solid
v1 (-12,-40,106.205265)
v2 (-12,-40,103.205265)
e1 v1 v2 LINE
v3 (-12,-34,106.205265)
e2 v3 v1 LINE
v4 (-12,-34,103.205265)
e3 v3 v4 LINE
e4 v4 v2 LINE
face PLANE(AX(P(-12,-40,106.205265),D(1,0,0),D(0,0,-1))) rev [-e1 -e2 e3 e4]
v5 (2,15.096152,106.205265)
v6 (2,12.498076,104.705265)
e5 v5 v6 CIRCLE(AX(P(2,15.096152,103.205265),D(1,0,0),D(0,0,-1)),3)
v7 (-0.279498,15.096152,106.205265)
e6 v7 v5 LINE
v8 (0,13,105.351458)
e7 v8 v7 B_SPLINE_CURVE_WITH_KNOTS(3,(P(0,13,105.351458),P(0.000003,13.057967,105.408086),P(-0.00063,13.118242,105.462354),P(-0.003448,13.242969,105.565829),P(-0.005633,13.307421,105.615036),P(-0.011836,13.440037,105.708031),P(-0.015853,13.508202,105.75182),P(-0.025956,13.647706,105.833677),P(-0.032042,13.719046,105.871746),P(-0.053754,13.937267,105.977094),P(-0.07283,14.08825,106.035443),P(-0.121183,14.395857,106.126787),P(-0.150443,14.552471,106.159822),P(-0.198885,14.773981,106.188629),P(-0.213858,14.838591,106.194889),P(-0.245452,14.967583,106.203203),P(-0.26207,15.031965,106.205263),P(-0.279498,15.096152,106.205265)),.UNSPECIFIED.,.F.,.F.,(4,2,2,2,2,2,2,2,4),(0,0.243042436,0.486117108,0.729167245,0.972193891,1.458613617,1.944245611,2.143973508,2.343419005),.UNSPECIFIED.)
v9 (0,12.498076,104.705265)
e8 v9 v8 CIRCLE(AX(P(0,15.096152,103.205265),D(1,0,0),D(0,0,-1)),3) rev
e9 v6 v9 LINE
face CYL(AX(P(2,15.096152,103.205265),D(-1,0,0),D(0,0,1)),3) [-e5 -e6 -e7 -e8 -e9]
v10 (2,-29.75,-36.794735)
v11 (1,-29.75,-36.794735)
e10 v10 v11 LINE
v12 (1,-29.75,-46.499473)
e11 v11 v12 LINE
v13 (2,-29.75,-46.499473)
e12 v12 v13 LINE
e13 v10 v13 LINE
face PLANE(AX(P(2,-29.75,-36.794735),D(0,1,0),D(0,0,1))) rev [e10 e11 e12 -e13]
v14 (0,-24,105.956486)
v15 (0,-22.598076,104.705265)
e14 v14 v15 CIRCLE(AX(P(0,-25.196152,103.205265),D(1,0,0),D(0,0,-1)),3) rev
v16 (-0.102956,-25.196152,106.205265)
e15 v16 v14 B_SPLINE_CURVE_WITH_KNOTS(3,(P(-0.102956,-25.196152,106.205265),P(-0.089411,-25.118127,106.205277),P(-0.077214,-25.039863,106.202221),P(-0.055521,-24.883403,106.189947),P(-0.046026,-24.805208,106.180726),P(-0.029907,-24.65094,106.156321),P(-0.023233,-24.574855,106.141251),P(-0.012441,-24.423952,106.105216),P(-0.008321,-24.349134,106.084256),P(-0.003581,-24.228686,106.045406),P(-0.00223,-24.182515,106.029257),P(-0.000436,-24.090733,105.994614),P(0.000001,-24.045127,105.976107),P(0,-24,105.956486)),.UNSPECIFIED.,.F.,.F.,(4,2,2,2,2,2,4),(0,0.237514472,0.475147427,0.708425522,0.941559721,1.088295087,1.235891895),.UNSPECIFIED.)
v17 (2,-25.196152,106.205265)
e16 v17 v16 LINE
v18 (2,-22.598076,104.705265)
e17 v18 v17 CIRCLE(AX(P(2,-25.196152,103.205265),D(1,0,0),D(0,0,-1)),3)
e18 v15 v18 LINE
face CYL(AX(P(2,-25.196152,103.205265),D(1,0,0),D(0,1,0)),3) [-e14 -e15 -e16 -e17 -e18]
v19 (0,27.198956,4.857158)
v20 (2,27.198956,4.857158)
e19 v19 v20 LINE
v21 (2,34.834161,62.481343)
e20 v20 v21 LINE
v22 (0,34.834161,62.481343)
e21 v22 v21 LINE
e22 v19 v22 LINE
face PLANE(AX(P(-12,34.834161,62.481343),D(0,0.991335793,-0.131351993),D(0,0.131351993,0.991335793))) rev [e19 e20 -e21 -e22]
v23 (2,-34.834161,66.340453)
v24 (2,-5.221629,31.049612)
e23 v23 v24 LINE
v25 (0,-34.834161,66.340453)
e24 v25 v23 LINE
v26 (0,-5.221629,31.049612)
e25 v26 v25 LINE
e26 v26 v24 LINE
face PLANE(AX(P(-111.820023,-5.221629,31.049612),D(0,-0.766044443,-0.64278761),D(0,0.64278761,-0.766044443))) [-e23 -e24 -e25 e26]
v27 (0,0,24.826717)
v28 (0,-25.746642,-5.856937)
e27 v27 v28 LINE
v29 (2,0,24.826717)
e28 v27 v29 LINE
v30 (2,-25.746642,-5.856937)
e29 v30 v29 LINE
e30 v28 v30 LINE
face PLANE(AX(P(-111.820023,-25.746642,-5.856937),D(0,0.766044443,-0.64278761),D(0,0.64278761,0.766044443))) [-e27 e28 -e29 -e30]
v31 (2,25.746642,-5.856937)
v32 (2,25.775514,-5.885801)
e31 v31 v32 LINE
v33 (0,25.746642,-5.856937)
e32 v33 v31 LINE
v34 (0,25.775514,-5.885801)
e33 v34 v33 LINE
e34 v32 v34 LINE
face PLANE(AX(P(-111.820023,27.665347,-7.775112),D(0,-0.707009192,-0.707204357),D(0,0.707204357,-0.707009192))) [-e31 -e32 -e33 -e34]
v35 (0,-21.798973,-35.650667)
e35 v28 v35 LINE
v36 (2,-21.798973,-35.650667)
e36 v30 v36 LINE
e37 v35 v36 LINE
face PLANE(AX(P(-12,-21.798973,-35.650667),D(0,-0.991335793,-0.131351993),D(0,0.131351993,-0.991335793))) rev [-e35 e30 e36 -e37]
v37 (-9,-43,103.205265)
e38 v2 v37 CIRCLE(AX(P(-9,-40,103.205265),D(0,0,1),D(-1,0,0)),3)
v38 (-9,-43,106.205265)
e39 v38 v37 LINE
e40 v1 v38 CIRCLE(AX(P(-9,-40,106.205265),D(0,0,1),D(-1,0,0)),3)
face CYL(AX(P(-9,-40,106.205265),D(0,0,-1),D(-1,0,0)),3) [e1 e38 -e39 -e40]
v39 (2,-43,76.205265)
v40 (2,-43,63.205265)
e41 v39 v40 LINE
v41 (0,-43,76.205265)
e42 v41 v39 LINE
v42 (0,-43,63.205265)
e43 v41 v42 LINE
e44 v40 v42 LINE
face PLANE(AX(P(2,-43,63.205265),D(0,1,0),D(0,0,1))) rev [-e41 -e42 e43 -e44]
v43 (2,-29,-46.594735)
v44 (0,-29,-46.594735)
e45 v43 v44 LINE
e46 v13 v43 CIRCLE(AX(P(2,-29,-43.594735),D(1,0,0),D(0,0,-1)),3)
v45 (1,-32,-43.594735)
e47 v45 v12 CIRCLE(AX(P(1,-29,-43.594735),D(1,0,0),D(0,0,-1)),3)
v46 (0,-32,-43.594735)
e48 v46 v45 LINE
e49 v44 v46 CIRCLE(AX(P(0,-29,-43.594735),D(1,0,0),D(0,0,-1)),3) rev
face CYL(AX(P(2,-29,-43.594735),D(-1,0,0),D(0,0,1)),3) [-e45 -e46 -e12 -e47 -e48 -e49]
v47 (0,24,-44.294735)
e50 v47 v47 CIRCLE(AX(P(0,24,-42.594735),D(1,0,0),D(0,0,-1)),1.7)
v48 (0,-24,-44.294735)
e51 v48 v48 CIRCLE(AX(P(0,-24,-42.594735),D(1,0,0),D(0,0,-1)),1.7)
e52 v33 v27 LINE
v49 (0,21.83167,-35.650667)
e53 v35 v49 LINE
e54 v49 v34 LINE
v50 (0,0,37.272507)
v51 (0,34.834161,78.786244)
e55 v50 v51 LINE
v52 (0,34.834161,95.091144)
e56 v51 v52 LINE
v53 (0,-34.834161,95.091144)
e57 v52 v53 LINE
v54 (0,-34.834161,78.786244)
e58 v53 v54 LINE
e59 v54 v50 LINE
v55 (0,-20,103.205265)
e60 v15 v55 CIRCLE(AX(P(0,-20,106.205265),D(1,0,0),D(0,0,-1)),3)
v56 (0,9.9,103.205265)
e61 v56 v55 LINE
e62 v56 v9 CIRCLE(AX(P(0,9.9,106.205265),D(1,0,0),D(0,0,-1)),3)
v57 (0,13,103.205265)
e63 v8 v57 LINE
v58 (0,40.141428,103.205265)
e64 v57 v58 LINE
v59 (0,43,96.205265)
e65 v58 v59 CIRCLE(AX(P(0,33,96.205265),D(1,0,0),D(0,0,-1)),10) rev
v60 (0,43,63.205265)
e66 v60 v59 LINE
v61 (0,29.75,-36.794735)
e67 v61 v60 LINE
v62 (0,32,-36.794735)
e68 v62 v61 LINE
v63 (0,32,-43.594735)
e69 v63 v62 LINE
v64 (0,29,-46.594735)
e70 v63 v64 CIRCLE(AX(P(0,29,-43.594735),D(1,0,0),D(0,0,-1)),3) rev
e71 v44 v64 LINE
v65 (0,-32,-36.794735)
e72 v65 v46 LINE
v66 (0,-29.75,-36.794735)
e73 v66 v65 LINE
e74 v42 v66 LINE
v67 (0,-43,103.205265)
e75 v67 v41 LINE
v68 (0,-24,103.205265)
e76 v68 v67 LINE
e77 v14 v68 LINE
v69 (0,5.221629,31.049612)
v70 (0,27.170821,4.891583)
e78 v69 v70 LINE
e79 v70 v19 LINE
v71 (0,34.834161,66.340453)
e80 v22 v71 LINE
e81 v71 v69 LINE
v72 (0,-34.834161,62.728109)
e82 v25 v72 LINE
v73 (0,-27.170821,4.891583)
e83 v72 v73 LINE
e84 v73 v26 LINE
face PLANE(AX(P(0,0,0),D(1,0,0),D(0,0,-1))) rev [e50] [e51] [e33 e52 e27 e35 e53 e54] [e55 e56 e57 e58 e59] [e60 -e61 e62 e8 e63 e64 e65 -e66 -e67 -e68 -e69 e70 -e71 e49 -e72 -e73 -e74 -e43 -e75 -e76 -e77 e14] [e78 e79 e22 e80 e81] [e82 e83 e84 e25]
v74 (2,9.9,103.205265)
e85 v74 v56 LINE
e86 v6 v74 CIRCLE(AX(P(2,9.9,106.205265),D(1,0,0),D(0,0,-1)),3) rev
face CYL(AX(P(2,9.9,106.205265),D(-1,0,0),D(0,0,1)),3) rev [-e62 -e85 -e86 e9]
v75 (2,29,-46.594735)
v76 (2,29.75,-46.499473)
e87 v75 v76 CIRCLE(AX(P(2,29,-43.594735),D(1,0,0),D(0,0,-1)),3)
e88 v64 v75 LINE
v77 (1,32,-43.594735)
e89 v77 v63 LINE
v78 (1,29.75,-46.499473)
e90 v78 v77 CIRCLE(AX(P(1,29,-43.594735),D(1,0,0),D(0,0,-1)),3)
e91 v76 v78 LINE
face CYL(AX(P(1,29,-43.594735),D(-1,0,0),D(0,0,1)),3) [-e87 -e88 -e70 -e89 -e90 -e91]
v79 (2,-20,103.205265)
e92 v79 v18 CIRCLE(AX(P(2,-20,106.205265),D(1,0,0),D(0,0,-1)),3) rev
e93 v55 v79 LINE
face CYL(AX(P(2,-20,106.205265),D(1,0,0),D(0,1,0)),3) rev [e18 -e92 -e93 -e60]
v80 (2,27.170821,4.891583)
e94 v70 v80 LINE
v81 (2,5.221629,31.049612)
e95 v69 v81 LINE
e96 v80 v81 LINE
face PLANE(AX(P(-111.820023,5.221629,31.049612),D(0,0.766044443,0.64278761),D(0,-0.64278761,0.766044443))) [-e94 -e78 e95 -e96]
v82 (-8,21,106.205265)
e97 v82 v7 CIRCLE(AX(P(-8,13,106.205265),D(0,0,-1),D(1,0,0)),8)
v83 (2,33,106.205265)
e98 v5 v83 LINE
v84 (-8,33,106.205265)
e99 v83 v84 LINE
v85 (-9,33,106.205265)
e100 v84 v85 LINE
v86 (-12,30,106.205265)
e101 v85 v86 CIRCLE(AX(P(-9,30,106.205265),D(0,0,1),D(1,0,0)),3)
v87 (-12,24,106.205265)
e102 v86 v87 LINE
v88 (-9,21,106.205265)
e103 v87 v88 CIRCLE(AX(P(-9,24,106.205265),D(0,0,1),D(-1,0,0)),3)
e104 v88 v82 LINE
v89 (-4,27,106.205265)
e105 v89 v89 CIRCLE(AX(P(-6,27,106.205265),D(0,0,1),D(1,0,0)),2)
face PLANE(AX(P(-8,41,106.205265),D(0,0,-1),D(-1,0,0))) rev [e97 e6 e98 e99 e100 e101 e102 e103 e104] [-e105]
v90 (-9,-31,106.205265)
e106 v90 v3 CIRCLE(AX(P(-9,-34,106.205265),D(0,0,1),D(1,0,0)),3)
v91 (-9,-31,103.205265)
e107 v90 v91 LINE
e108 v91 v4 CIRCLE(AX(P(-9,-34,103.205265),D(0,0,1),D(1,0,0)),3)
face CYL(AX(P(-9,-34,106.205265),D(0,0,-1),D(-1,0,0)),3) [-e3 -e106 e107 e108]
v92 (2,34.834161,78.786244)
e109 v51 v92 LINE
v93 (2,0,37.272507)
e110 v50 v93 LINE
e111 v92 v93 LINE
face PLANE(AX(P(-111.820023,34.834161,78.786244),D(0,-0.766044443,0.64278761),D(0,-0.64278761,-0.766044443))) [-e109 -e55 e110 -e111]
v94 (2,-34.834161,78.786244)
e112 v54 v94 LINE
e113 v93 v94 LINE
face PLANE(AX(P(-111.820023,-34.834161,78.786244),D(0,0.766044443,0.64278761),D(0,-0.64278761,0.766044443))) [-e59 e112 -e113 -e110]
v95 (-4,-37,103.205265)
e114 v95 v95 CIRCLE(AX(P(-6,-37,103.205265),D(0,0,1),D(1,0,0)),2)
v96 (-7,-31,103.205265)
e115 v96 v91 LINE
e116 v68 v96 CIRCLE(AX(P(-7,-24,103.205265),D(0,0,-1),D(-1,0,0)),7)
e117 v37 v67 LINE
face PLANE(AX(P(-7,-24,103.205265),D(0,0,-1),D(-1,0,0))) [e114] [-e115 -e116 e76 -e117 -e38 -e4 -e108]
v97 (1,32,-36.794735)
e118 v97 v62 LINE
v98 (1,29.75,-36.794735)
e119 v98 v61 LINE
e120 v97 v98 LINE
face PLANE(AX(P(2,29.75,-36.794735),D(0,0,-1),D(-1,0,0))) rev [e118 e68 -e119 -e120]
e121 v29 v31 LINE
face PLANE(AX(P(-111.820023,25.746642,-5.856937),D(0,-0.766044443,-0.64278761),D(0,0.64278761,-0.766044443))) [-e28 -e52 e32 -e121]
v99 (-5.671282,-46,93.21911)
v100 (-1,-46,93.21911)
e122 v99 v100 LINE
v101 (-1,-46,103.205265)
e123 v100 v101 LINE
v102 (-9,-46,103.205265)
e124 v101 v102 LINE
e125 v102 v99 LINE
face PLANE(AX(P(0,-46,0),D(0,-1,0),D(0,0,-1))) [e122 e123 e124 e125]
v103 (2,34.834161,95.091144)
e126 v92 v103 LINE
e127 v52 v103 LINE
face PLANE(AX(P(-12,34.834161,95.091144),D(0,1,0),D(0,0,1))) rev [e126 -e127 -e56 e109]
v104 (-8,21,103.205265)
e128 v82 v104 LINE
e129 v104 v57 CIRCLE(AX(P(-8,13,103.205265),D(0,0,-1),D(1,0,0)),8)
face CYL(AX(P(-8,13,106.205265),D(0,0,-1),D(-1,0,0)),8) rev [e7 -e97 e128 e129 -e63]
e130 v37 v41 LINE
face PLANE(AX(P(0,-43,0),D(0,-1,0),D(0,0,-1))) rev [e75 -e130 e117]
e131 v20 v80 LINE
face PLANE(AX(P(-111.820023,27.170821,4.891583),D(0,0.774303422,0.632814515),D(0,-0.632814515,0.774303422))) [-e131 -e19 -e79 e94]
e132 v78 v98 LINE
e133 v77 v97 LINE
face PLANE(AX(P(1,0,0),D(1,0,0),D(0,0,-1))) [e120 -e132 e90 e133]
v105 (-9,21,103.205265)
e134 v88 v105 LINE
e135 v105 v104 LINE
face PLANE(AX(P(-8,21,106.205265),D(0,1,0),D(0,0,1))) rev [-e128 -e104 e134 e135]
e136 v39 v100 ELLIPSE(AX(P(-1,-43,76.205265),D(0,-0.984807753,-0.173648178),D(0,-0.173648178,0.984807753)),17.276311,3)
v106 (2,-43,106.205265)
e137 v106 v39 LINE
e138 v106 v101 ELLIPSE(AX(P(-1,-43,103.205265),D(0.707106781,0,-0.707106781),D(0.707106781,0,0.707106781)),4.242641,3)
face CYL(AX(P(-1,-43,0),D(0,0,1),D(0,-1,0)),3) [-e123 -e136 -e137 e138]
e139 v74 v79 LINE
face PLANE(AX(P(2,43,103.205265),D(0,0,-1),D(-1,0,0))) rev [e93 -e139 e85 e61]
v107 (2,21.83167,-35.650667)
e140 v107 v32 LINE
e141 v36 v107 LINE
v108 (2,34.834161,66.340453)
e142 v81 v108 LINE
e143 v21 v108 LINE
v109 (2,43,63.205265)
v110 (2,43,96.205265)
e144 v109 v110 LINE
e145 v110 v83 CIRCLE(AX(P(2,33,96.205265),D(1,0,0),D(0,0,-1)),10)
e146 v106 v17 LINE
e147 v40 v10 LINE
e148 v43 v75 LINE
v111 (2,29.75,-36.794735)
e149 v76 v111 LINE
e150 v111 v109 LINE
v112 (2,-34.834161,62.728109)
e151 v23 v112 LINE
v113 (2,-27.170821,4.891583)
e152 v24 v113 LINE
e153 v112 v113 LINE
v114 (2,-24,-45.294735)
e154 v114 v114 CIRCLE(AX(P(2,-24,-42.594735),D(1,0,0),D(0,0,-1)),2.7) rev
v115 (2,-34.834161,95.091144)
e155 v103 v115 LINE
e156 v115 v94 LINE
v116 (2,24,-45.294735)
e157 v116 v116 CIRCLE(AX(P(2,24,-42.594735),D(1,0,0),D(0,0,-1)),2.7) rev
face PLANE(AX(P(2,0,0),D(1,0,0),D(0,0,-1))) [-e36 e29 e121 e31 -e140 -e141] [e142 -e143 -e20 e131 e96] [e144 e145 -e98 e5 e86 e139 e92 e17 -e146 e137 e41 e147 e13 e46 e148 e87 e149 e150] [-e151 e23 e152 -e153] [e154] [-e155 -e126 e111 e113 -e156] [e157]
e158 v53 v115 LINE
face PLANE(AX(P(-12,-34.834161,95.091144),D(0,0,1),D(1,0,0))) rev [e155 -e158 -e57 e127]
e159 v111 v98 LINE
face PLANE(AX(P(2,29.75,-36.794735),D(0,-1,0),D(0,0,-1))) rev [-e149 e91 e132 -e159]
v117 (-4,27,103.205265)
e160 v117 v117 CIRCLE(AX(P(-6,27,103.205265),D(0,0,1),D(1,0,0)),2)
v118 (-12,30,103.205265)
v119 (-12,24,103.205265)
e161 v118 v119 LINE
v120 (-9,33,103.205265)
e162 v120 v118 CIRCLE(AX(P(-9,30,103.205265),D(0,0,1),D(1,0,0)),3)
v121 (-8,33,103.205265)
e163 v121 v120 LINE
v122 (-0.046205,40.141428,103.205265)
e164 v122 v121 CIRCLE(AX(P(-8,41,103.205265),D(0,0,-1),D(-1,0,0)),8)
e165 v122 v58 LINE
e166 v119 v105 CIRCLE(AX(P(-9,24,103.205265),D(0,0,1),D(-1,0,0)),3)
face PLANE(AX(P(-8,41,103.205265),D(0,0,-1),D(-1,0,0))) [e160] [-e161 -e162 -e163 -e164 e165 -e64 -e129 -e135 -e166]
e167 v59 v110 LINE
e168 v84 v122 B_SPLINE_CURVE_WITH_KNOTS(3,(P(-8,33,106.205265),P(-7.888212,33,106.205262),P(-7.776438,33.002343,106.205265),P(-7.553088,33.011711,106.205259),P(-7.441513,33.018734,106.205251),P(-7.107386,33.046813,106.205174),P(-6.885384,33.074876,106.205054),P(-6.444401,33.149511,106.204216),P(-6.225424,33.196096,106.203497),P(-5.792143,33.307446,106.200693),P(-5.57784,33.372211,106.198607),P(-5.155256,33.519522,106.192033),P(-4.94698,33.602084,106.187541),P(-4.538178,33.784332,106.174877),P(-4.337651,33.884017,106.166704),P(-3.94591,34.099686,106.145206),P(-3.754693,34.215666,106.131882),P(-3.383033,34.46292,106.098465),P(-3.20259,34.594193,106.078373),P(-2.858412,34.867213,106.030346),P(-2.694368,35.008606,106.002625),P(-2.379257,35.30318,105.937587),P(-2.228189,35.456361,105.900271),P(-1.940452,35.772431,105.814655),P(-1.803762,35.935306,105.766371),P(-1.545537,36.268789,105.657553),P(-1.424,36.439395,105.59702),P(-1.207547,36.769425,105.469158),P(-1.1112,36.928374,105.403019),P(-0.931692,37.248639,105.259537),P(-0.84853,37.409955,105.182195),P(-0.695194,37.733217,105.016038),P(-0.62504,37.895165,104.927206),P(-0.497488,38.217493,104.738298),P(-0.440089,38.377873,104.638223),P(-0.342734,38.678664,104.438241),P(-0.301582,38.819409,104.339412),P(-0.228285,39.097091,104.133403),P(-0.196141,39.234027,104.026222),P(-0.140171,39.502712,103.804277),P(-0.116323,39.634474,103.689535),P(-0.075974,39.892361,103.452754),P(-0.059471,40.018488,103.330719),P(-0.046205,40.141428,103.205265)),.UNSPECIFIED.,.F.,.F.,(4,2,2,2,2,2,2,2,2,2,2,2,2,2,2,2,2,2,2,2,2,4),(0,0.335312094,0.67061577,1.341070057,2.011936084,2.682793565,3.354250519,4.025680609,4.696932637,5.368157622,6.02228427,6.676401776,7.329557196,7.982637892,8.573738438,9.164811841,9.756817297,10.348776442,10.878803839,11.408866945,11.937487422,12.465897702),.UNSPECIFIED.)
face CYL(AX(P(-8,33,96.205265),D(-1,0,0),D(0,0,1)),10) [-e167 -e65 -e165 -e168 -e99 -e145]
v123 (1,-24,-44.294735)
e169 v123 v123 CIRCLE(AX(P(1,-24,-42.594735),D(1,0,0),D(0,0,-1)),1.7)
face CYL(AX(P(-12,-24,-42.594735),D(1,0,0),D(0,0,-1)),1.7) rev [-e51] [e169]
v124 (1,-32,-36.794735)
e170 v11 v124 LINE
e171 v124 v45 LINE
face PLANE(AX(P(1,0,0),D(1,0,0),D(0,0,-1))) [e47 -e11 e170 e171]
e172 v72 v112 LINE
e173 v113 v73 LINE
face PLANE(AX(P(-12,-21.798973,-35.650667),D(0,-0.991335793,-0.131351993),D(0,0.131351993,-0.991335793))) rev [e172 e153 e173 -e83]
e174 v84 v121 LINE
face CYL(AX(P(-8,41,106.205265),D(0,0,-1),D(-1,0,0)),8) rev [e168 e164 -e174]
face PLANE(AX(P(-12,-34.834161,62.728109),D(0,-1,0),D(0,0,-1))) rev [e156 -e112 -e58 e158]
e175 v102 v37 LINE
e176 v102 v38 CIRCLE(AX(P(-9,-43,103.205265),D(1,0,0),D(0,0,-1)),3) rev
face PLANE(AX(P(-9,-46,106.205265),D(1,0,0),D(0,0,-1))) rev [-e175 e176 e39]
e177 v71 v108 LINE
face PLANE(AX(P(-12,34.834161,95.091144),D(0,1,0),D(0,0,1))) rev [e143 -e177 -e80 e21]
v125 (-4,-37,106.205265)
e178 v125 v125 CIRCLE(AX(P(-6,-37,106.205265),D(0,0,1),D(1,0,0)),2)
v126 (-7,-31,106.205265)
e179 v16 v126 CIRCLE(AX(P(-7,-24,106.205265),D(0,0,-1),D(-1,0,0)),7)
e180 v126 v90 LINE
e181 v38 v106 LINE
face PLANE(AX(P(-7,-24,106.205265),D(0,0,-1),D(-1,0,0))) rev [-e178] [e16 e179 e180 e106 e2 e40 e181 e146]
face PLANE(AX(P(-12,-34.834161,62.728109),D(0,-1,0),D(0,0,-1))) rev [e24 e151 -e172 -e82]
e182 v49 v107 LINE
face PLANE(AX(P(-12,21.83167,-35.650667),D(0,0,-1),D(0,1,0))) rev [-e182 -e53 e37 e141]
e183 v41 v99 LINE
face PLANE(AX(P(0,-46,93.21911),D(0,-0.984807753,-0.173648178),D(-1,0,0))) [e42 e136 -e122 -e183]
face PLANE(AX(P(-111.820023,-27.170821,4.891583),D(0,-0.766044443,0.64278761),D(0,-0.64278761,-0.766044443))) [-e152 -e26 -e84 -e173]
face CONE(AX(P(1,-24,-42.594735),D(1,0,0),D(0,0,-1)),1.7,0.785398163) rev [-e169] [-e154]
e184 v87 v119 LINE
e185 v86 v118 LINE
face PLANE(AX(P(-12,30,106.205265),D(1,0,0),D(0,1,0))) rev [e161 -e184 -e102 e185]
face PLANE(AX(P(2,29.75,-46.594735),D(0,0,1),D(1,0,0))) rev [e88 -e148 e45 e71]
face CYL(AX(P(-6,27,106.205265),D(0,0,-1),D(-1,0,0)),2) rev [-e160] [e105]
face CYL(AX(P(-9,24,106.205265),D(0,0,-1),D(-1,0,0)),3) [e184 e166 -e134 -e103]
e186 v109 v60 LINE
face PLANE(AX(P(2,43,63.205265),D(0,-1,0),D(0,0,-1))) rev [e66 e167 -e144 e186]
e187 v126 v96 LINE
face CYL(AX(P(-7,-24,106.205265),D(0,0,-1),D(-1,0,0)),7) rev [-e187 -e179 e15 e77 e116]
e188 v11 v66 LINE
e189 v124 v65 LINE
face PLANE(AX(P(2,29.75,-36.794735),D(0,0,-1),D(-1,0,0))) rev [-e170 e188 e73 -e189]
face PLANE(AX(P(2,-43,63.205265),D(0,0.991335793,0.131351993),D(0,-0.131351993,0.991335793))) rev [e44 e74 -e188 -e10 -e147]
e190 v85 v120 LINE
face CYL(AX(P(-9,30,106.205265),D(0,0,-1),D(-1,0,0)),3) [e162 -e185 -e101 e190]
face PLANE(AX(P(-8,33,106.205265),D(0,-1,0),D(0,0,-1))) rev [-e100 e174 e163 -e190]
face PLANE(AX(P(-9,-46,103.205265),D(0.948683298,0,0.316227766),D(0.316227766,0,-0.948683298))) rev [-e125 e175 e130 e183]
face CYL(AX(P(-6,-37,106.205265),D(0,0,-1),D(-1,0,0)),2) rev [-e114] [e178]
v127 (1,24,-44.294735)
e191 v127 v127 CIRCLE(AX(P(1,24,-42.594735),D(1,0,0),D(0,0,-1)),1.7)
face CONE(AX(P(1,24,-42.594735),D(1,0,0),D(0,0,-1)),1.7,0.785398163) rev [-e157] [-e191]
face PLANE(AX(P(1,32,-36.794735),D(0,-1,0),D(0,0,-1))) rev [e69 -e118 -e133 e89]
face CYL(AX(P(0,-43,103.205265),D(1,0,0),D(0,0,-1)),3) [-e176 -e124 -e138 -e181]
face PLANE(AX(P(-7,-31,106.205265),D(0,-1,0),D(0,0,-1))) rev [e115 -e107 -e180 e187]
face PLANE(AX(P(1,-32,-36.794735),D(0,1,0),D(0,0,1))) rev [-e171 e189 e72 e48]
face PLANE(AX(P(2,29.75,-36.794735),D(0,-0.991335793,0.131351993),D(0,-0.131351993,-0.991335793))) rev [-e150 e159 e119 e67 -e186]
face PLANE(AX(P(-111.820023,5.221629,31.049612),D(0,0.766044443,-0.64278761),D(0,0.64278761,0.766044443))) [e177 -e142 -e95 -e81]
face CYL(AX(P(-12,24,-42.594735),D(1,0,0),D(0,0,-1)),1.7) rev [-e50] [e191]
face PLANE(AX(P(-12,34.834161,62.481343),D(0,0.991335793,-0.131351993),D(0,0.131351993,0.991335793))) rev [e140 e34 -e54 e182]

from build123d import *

# Parameters (mm, degrees)
SKETCH1_W           = 9.8
SKETCH1_H           = 59.5
BOSS_EXTRUDE1_DEPTH = 2
SKETCH2_W           = 9.8
SKETCH2_H           = 64
BOSS_EXTRUDE2_DEPTH = 1
FILLET1_R           = 3
BOSS_EXTRUDE3_DEPTH = 2
SKETCH4_R           = 2
BOSS_EXTRUDE4_DEPTH = 3
FILLET2_R           = 3
FILLET3_R           = 3
SKETCH5_R           = 2
BOSS_EXTRUDE5_DEPTH = 3
FILLET4_R           = 10
FILLET6_R           = 3
FILLET7_R           = 3
BOSS_EXTRUDE6_DEPTH = 3
CHAMFER1_SIZE2      = 3
CHAMFER1_SIZE       = 17.013845459
FILLET10_R          = 3
CUT_EXTRUDE1_DEPTH  = 117.582838676
BOSS_EXTRUDE7_DEPTH = 2
SKETCH9_R           = 1.7
CUT_EXTRUDE2_DEPTH  = 117.582838676
CHAMFER2_SIZE       = 1


# Some blends are built 0.0001 mm under size
with BuildPart() as part:
    # Sketch1 → Boss-Extrude1 (new body)
    with BuildSketch(Plane(origin=(0, 0, 0), x_dir=(0, 0, -1), z_dir=(1, 0, 0))):
        with Locations((41.694735288, 0)):
            Rectangle(SKETCH1_W, SKETCH1_H)
    extrude(amount=BOSS_EXTRUDE1_DEPTH)

    # Sketch2 → Boss-Extrude2 (add)
    with BuildSketch(Plane(origin=(0, 0, 0), x_dir=(0, 0, -1), z_dir=(1, 0, 0))):
        with Locations((41.694735288, 0)):
            Rectangle(SKETCH2_W, SKETCH2_H)
    extrude(amount=BOSS_EXTRUDE2_DEPTH)

    # Fillet1
    fillet1_edges = [part.edges().sort_by_distance(p)[0] for p in [
        (0.5, -32, -46.594735288),
        (0.5, 32, -46.594735288),
    ]]
    fillet(fillet1_edges, radius=FILLET1_R)

    # Sketch3 → Boss-Extrude3 (add)
    with BuildSketch(Plane(origin=(0, 0, 0), x_dir=(0, 0, -1), z_dir=(1, 0, 0))):
        Polygon((36.794735288, 29.75), (-63.205264712, 43), (-103.205264712, 43), (-103.205264712, -43), (-63.205264712, -43), (36.794735288, -29.75), align=None)
    extrude(amount=BOSS_EXTRUDE3_DEPTH)

    # Sketch4 → Boss-Extrude4 (add)
    with BuildSketch(Plane.XY.offset(103.205264712)):
        with BuildLine():
            Line((2, -43), (-9, -43))
            ThreePointArc((-9, -43), (-11.121320344, -42.121320344), (-12, -40))
            Line((-12, -40), (-12, -34))
            ThreePointArc((-12, -34), (-11.121320344, -31.878679656), (-9, -31))
            Line((-9, -31), (-7, -31))
            ThreePointArc((-7, -31), (-2.050252532, -28.949747468), (0, -24))
            Line((0, -24), (0, -23))
            Line((0, -23), (2, -23))
            Line((2, -23), (2, -31))
            Line((2, -31), (2, -43))
        make_face()
        with Locations((-6, -37)):
            Circle(SKETCH4_R, mode=Mode.SUBTRACT)
    extrude(amount=BOSS_EXTRUDE4_DEPTH)

    # Fillet2
    fillet2_edges = [part.edges().sort_by_distance(p)[0] for p in [
        (1, -23, 103.205264712),
    ]]
    fillet(fillet2_edges, radius=FILLET2_R - 0.0001)  # a hair under: the kernel refuses the full size

    # Fillet3
    # the kernel refuses this fillet: 3 mm, written as the material it takes off along each edge
    with BuildSketch(Plane(origin=(-5.490486718, -23, 106.205264712), x_dir=(0, 0.2587982993664488, -0.9659313848535175), z_dir=(1, 0, 0))) as fillet3_piece_1:
        with BuildLine():
            CenterArc((2.329422704, -2.897768274), FILLET3_R, 105.000679234, 60.000551337)
            Line((-0.56837145, -2.121373376), (-0.858150866, -2.043733886))
            Line((-0.858150866, -2.043733886), (-0.289779415, 0.07763949))
            Line((-0.289779415, 0.07763949), (0.07763949, 0.289779415))
            ThreePointArc((0.07763949, 0.289779415), (0.077736083, 0.289753536), (1.475282068, 0.289776827))
            Line((1.475282068, 0.289776827), (1.552931216, 0))
        make_face()
    extrude(amount=12.980973437, mode=Mode.SUBTRACT)

    # Sketch5 → Boss-Extrude5 (add)
    with BuildSketch(Plane.XY.offset(103.205264712)):
        with BuildLine():
            Line((-8, 33), (-9, 33))
            ThreePointArc((-9, 33), (-11.121320344, 32.121320344), (-12, 30))
            Line((-12, 30), (-12, 24))
            ThreePointArc((-12, 24), (-11.121320344, 21.878679656), (-9, 21))
            Line((-9, 21), (-8, 21))
            ThreePointArc((-8, 21), (-2.343145751, 18.656854249), (0, 13))
            Line((0, 13), (0, 12.9))
            Line((0, 12.9), (2, 12.9))
            Line((2, 12.9), (2, 21))
            Line((2, 21), (2, 33))
            Line((2, 33), (2, 43))
            Line((2, 43), (0, 43))
            Line((0, 43), (0, 41))
            ThreePointArc((0, 41), (-2.343145751, 35.343145751), (-8, 33))
        make_face()
        with Locations((-6, 27)):
            Circle(SKETCH5_R, mode=Mode.SUBTRACT)
    extrude(amount=BOSS_EXTRUDE5_DEPTH)

    # Fillet4
    # the kernel refuses this fillet: 10 mm, written as the material it takes off along each edge
    with BuildSketch(Plane(origin=(27, 43, 106.205264712), x_dir=(0, 0, -1), z_dir=(-1, 0, 0))) as fillet4_piece_1:
        with BuildLine():
            CenterArc((FILLET4_R, FILLET4_R), FILLET4_R, 180, 90)
            Line((0, FILLET4_R), (0, 0))
            Line((0, 0), (FILLET4_R, 0))
        make_face()
    extrude(amount=52, mode=Mode.SUBTRACT)

    # Fillet6
    fillet6_edges = [part.edges().sort_by_distance(p)[0] for p in [
        (1, 12.9, 103.205264712),
    ]]
    fillet(fillet6_edges, radius=FILLET6_R - 0.0001)  # a hair under: the kernel refuses the full size

    # Fillet7
    # the kernel refuses this fillet: 3 mm, written as the material it takes off along each edge
    with BuildSketch(Plane(origin=(-5.490486718, 12.9, 106.205264712), x_dir=(0, -0.2587982993664468, -0.9659313848535179), z_dir=(1, 0, 0))) as fillet7_piece_1:
        with BuildLine():
            CenterArc((2.329422704, 2.897768274), FILLET7_R, 194.99876943, 60.000551337)
            Line((-0.56837145, 2.121373376), (-0.858150866, 2.043733886))
            Line((-0.858150866, 2.043733886), (-0.289779415, -0.07763949))
            Line((-0.289779415, -0.07763949), (0.07763949, -0.289779415))
            ThreePointArc((0.07763949, -0.289779415), (0.077736083, -0.289753536), (1.475282068, -0.289776827))
            Line((1.475282068, -0.289776827), (1.552931216, 0))
        make_face()
    extrude(amount=12.980973437, mode=Mode.SUBTRACT)

    # Sketch6 → Boss-Extrude6 (add)
    with BuildSketch(Plane.XZ.offset(43)):
        Polygon((2, 106.205264712), (-9, 106.205264712), (-9, 103.205264712), (0, 76.205264712), (2, 76.205264712), align=None)
    extrude(amount=BOSS_EXTRUDE6_DEPTH)

    # Chamfer1
    chamfer1_edges = [part.edges().sort_by_distance(p)[0] for p in [
        (1, -46, 76.205264712),
    ]]
    chamfer1_side = [part.faces().sort_by_distance(p)[0] for p in [
        (1, -46, 76.265264712),
    ]]
    chamfer(chamfer1_edges, length=CHAMFER1_SIZE - 0.0001, length2=CHAMFER1_SIZE2 - 0.0001, reference=chamfer1_side[0])  # a hair under: the kernel refuses the full size

    # Fillet10
    fillet10_edges = [part.edges().sort_by_distance(p)[0] for p in [
        (2, -46, 99.712137442),
        (-3.5, -46, 106.205264712),
    ]]
    fillet(fillet10_edges, radius=FILLET10_R)

    # Sketch7 → Cut-Extrude1 (cut, through all)
    with BuildSketch(Plane(origin=(2, 0, 0), x_dir=(0, 0, -1), z_dir=(1, 0, 0))):
        Polygon((35.650666719, 21.831669631), (35.650666719, -21.798973174), (-62.72810878, -34.834160927), (-95.091144317, -34.834160927), (-95.091144317, 34.834160927), (-62.481343063, 34.834160927), align=None)
    extrude(amount=-CUT_EXTRUDE1_DEPTH, mode=Mode.SUBTRACT)

    # Sketch8 → Boss-Extrude7 (add)
    with BuildSketch(Plane(origin=(2, 0, 0), x_dir=(0, 0, -1), z_dir=(1, 0, 0))):
        Polygon((-78.78624369, 34.834160927), (-37.27250726, 0), (-78.78624369, -34.834160927), (-66.340453075, -34.834160927), (-31.049611953, -5.221629157), (-4.891583353, -27.170821308), (-1.562241162, -29.964471113), (8.678277132, -28.114027922), (5.856936901, -25.746642374), (-24.826716646, 0), (5.856936901, 25.746642374), (7.77511163, 27.665346604), (-2.902361224, 28.796551739), (-4.891583353, 27.170821308), (-31.049611953, 5.221629157), (-66.340453075, 34.834160927), align=None)
    extrude(amount=-BOSS_EXTRUDE7_DEPTH)

    # Sketch9 → Cut-Extrude2 (cut, through all)
    with BuildSketch(Plane(origin=(2, 0, 0), x_dir=(0, 0, -1), z_dir=(1, 0, 0))):
        with Locations((42.594735288, 24)):
            Circle(SKETCH9_R)
        with Locations((42.594735288, -24)):
            Circle(SKETCH9_R)
    extrude(amount=-CUT_EXTRUDE2_DEPTH, mode=Mode.SUBTRACT)

    # Chamfer2
    chamfer2_edges = [part.edges().sort_by_distance(p)[0] for p in [
        (2, 24, -40.894735288),
        (2, -24, -40.894735288),
    ]]
    chamfer(chamfer2_edges, length=CHAMFER2_SIZE)


solid = part.part
